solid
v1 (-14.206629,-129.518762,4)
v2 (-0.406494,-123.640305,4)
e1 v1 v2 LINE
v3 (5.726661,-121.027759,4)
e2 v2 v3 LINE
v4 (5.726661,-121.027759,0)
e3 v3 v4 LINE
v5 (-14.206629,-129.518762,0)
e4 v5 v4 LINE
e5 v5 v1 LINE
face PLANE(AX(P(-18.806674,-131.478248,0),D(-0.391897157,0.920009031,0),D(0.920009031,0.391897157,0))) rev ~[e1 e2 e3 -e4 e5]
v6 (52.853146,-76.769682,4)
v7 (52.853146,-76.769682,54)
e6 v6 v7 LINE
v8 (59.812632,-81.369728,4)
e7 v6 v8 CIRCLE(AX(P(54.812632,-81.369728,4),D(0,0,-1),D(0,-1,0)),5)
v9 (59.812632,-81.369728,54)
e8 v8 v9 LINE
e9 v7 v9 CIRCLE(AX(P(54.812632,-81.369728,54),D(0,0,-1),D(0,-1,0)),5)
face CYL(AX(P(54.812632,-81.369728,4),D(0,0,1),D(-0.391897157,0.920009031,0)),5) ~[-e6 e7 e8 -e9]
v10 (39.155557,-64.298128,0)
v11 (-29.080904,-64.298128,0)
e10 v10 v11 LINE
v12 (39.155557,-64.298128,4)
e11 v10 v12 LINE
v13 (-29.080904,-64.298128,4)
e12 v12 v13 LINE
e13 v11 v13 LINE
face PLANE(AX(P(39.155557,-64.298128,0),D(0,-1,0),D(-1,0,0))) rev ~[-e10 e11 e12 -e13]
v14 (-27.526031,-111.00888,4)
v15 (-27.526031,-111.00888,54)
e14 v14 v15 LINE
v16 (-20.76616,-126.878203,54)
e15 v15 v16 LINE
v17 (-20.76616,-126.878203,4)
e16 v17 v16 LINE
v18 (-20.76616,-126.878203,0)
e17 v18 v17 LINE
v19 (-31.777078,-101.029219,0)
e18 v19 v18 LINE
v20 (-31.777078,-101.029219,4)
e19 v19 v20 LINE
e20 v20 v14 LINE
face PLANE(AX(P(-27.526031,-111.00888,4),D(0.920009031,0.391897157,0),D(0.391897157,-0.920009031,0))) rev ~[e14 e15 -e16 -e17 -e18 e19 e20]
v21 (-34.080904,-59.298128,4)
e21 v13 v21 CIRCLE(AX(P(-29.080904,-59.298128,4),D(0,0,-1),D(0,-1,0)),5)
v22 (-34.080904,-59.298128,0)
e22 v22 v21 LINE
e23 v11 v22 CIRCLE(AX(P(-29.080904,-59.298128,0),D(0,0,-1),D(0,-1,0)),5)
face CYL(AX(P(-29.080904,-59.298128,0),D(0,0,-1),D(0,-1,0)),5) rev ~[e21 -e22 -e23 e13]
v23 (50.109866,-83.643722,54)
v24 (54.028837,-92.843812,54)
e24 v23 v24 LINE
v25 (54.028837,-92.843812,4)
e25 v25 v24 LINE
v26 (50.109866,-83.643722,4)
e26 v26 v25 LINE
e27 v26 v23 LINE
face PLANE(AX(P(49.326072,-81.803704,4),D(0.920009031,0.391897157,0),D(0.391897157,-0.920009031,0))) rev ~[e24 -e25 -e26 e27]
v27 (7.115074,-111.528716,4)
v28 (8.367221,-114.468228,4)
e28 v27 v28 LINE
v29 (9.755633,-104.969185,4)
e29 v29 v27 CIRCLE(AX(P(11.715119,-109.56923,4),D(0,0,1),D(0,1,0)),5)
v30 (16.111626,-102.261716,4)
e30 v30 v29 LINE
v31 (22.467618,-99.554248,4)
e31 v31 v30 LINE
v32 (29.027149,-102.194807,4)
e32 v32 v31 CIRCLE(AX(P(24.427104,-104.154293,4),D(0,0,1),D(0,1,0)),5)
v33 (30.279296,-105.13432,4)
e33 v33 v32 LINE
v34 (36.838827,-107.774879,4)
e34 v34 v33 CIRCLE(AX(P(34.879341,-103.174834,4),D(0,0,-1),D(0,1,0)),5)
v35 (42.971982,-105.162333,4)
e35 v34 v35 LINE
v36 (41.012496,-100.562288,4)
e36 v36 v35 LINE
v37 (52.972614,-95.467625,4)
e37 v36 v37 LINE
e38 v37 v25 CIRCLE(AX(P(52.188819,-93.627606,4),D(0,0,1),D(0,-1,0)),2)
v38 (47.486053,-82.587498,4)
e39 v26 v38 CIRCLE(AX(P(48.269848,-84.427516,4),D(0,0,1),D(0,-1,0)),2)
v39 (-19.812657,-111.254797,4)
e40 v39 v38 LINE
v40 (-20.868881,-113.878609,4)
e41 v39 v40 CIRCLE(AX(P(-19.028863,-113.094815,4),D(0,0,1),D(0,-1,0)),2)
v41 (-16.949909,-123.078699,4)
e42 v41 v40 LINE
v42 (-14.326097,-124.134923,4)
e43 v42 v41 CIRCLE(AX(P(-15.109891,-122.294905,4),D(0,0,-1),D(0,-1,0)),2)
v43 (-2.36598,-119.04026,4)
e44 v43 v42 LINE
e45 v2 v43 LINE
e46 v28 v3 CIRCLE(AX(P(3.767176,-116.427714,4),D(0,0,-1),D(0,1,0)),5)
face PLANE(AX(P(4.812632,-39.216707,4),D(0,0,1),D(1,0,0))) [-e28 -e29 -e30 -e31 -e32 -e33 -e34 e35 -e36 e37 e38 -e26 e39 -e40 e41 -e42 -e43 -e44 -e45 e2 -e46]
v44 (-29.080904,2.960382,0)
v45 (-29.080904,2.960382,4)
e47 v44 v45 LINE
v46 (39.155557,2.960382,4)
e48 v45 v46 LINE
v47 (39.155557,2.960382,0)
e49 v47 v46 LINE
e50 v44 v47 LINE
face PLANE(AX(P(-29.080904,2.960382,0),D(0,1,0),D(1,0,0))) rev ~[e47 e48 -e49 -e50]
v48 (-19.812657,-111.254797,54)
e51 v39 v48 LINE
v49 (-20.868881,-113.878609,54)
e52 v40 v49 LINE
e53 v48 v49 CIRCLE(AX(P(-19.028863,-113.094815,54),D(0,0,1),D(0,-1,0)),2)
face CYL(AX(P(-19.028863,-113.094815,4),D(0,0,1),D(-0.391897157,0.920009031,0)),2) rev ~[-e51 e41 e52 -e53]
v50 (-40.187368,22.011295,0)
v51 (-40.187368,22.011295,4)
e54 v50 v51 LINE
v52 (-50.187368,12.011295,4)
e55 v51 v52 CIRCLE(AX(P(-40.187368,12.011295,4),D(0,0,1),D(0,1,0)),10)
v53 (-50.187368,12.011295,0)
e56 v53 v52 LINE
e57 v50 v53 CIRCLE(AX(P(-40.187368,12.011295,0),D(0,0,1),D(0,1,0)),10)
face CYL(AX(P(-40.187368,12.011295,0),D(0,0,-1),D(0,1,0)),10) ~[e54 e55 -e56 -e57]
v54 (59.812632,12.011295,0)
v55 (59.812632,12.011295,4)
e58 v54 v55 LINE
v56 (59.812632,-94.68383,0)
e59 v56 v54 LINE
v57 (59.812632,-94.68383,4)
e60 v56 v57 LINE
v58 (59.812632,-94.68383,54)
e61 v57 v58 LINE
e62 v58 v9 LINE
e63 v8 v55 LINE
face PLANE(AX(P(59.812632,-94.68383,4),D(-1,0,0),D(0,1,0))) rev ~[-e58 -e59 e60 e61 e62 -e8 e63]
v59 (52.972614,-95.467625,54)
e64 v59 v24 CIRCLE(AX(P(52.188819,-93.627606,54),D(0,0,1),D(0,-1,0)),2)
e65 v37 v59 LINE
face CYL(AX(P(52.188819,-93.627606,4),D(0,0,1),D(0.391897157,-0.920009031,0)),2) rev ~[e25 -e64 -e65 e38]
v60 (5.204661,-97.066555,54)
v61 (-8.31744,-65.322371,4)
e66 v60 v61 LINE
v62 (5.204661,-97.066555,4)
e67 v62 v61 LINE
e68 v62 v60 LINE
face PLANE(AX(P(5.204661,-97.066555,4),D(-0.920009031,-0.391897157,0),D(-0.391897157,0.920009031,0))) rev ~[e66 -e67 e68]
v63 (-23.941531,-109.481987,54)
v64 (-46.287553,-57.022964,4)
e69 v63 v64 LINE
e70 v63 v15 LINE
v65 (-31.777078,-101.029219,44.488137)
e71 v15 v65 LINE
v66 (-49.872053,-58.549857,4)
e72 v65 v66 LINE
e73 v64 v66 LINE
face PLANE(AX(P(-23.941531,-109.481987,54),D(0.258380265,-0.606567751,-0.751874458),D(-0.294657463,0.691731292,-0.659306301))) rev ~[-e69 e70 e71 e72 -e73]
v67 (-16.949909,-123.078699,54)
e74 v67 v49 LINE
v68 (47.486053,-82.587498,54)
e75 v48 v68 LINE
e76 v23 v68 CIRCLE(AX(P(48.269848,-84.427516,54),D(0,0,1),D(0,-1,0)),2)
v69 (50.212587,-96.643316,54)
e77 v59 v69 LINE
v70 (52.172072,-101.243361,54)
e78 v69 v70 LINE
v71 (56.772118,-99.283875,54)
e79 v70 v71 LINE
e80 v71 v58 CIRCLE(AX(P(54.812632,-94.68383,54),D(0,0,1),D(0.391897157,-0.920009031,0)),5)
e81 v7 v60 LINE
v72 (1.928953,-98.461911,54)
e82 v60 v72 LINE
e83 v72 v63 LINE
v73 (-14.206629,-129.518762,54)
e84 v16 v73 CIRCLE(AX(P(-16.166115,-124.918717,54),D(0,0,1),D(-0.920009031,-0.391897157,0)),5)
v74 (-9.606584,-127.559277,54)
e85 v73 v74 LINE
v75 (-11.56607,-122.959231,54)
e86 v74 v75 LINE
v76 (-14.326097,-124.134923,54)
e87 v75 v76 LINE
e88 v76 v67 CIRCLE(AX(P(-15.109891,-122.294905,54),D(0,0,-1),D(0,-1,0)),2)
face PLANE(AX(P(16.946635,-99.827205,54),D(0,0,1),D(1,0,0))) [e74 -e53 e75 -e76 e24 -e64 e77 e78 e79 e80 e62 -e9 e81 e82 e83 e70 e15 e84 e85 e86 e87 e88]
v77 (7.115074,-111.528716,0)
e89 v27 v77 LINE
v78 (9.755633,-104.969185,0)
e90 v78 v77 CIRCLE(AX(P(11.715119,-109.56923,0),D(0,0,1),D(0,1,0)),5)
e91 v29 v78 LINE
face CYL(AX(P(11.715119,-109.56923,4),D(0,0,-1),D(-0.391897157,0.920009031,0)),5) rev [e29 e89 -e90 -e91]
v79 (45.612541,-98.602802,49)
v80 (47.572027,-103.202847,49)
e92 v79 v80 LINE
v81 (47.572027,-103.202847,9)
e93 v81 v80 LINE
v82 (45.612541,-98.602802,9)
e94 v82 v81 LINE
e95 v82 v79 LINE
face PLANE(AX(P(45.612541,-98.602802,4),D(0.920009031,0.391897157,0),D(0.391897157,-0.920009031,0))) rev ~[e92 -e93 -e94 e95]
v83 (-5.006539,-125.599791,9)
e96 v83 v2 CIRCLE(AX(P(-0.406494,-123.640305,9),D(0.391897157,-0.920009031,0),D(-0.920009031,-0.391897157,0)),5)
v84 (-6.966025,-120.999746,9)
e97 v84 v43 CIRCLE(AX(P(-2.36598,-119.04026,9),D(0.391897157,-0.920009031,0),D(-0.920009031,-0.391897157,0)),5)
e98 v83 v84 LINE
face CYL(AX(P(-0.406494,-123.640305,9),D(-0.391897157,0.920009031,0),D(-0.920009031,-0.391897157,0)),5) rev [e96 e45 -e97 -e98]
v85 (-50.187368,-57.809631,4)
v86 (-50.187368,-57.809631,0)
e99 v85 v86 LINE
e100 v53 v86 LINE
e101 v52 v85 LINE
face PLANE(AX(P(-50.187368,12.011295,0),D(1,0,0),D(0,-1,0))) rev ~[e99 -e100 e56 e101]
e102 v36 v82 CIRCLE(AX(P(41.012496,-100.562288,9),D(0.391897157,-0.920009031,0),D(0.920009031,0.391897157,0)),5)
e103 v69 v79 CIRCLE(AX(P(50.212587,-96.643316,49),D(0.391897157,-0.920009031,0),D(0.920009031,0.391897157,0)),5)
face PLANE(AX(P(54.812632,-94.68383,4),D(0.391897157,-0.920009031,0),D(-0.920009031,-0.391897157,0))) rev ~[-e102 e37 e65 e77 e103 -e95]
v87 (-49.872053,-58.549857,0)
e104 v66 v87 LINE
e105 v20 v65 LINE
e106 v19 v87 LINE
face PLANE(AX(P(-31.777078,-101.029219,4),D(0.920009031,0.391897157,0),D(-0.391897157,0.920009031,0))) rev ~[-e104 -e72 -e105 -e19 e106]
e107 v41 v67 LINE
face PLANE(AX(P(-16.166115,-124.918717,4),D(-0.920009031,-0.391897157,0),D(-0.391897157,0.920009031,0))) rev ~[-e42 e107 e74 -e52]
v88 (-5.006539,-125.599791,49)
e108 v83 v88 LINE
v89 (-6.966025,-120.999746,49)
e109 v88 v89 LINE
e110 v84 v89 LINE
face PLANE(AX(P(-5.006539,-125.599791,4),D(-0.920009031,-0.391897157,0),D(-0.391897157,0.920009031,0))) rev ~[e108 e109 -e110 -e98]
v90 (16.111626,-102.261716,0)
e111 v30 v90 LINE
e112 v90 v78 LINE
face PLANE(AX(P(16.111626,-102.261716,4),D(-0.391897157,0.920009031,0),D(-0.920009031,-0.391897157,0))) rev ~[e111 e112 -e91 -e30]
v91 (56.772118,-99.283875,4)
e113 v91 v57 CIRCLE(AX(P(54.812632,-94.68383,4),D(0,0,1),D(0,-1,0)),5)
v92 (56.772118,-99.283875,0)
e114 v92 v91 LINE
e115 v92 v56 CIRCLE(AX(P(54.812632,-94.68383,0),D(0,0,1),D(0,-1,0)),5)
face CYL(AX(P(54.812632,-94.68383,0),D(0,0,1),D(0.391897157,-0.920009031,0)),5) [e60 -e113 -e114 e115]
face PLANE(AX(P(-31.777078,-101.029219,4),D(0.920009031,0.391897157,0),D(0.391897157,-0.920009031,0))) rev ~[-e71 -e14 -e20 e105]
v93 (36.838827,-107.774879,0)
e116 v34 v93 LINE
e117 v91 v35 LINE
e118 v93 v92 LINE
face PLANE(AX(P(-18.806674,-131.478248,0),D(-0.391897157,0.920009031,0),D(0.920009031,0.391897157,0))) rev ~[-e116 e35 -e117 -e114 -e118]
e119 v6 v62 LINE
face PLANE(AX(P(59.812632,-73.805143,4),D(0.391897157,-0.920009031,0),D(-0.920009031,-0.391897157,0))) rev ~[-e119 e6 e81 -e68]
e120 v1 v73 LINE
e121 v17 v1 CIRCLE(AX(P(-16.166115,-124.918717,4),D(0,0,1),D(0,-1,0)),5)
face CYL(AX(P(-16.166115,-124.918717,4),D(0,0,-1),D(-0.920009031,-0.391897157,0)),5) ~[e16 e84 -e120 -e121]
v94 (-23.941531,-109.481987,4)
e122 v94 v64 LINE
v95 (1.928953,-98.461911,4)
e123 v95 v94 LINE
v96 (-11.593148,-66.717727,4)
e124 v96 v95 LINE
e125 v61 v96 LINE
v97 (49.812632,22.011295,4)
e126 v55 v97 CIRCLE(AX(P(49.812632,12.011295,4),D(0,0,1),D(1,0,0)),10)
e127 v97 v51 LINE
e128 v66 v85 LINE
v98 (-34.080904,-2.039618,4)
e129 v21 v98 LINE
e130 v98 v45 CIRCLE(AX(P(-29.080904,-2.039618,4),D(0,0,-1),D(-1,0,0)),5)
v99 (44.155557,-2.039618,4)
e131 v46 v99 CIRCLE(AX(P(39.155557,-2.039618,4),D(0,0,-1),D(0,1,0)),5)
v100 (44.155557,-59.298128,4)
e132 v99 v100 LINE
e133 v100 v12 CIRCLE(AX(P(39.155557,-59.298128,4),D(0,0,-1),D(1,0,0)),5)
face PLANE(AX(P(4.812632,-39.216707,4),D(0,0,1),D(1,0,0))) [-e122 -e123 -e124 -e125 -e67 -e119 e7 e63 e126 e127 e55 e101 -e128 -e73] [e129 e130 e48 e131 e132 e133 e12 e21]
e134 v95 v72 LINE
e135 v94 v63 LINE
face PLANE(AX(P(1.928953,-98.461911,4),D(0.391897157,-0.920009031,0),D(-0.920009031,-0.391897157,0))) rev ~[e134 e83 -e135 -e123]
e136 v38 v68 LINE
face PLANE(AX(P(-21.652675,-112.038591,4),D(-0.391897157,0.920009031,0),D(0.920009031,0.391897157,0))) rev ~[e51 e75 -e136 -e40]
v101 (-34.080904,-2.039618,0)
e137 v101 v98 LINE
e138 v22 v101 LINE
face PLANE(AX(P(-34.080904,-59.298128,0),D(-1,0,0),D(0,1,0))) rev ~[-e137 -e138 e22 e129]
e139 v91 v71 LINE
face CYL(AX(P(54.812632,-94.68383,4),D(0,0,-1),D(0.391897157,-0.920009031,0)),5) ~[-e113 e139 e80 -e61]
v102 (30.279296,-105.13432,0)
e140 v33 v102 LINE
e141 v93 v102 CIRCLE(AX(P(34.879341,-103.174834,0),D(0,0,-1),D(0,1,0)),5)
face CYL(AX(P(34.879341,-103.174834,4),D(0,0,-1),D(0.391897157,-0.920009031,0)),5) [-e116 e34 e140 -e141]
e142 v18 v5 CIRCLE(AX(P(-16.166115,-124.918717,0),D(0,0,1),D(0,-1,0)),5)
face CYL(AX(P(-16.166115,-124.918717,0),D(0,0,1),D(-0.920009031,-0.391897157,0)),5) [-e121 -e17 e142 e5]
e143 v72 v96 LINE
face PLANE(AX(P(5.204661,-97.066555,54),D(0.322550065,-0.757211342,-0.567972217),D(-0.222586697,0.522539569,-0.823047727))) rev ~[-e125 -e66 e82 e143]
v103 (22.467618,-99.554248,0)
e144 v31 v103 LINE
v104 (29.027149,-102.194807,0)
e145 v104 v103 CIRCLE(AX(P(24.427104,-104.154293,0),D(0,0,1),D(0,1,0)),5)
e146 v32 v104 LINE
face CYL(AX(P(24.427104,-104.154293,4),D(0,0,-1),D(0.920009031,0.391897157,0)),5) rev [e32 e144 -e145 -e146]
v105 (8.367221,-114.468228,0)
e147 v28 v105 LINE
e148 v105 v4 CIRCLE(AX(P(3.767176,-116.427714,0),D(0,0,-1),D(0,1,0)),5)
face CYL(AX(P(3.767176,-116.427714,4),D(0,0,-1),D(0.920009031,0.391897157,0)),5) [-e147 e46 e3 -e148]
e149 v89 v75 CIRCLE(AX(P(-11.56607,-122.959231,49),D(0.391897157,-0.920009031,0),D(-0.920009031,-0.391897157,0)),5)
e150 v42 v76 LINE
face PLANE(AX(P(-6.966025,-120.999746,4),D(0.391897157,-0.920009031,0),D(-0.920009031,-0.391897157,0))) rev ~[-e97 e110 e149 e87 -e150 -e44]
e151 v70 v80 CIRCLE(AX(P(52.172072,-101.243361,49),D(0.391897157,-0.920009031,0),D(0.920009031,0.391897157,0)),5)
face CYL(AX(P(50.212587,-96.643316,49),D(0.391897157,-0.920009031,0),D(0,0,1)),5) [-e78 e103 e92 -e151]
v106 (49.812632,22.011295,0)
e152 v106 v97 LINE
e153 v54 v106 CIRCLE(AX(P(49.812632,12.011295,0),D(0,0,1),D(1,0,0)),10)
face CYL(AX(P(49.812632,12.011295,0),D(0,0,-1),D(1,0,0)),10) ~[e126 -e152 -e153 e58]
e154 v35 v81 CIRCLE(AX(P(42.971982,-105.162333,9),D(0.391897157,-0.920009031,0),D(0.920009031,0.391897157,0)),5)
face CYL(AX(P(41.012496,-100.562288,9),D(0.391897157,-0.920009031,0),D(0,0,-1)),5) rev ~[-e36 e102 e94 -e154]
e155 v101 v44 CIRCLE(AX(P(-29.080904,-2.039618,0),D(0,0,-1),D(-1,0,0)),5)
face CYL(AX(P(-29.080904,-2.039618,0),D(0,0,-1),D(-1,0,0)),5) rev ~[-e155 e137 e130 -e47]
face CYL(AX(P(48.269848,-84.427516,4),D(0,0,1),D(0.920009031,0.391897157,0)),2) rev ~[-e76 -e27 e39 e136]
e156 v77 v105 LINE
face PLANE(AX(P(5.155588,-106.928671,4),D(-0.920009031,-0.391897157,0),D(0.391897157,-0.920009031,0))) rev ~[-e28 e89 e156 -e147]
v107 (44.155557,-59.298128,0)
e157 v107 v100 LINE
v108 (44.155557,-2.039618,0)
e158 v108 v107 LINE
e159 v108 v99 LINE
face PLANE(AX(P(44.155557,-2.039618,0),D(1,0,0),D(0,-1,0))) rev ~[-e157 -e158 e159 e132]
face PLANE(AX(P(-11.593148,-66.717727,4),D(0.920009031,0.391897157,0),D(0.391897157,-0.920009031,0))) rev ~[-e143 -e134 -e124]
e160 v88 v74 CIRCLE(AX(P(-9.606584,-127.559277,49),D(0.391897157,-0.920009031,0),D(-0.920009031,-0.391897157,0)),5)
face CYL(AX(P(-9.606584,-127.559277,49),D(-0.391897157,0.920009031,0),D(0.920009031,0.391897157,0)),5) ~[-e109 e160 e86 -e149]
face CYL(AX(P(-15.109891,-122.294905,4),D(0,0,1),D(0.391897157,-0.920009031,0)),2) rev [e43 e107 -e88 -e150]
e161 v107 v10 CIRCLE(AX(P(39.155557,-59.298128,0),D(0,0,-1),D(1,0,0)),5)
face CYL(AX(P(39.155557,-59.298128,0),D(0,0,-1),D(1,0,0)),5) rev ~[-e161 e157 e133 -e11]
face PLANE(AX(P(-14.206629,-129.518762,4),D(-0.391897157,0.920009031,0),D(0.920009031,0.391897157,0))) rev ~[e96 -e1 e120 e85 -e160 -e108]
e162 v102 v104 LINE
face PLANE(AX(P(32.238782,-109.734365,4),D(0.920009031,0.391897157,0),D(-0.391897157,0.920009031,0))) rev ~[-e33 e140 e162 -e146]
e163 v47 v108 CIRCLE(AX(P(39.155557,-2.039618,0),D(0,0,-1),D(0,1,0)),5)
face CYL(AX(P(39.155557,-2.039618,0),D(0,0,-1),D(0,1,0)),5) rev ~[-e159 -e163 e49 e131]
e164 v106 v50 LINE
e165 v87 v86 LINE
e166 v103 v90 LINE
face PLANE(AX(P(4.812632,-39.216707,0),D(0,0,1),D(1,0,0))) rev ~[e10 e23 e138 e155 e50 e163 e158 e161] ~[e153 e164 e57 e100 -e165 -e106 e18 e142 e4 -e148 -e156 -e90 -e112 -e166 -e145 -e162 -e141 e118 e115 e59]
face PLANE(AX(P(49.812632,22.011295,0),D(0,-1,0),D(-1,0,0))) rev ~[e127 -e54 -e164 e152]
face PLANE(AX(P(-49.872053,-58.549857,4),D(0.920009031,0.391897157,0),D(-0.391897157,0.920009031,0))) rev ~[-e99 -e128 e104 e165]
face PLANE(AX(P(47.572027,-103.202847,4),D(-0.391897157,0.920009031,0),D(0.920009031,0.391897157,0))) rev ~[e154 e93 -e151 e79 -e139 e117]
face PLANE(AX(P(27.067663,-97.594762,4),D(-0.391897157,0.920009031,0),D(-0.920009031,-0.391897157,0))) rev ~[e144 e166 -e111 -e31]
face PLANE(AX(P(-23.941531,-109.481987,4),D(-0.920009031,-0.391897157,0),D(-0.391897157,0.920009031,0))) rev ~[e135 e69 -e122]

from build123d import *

# Parameters (mm, degrees)
F1_DEPTH  = 4
F2_R      = 5
F4_DEPTH  = 50
F6_DEPTH  = 25
F7_R      = 5
F8_R      = 2
F10_DEPTH = 25
F12_DEPTH = 25
F14_DEPTH = 25
F15_R     = 5


with BuildPart() as f1:
    # F0 (on Top) → F1 (new body)
    with BuildSketch(Plane.XY):
        with BuildLine():
            Line((49.8126317561, 22.0112954478), (-40.1873682439, 22.0112954478))
            ThreePointArc((-40.1873682439, 22.0112954478), (-47.2584360558, 19.0823632597), (-50.1873682439, 12.0112954478))
            Line((-50.1873682439, 12.0112954478), (-50.1873682439, -97.9887045522))
            Line((-50.1873682439, -97.9887045522), (-33.0722484738, -97.9887045522))
            Line((-33.0722484738, -97.9887045522), (59.8126317561, -97.9887045522))
            Line((59.8126317561, -97.9887045522), (59.8126317561, 12.0112954478))
            ThreePointArc((59.8126317561, 12.0112954478), (56.8836995679, 19.0823632597), (49.8126317561, 22.0112954478))
        make_face()
        with BuildLine():
            Line((-34.0809039772, -59.2981277779), (-34.0809039772, -2.0396176167))
            ThreePointArc((-34.0809039772, -2.0396176167), (-32.6164378831, 1.4959162892), (-29.0809039772, 2.9603823833))
            Line((-29.0809039772, 2.9603823833), (39.1555567086, 2.9603823833))
            ThreePointArc((39.1555567086, 2.9603823833), (42.6910906145, 1.4959162892), (44.1555567086, -2.0396176167))
            Line((44.1555567086, -2.0396176167), (44.1555567086, -59.2981277779))
            ThreePointArc((44.1555567086, -59.2981277779), (42.6910906145, -62.8336616838), (39.1555567086, -64.2981277779))
            Line((39.1555567086, -64.2981277779), (-29.0809039772, -64.2981277779))
            ThreePointArc((-29.0809039772, -64.2981277779), (-32.6164378831, -62.8336616838), (-34.0809039772, -59.2981277779))
        make_face(mode=Mode.SUBTRACT)
        Polygon((-18.8066744284, -131.4782482004), (59.8126317561, -97.9887045522), (-33.0722484738, -97.9887045522), align=None)
    extrude(amount=F1_DEPTH)

    # F2
    f2_edges = [f1.edges().sort_by_distance(p)[0] for p in [
        (-33.072248, -97.988705, 2),
        (-50.187368, -97.988705, 2),
        (59.812632, -97.988705, 2),
        (-18.806674, -131.478248, 2),
    ]]
    fillet(f2_edges, radius=F2_R)

    # F3 (on face) → F4 (join)
    with BuildSketch(Plane.XY.offset(4)):
        with BuildLine():
            Line((-6.9660247439, -120.9997456811), (-16.1661150585, -124.9187172558))
            Line((-16.1661150585, -124.9187172558), (-21.6526752631, -112.0385908154))
            Line((-21.6526752631, -112.0385908154), (49.3260715515, -81.8037038021))
            Line((49.3260715515, -81.8037038021), (54.8126317561, -94.6838302426))
            Line((54.8126317561, -94.6838302426), (45.6125414415, -98.6028018173))
            Line((45.6125414415, -98.6028018173), (47.5720272288, -103.2028469746))
            Line((47.5720272288, -103.2028469746), (56.7721175434, -99.2838753999))
            ThreePointArc((56.7721175434, -99.2838753999), (58.9838083848, -97.4408731388), (59.8126317561, -94.6838302426))
            Line((59.8126317561, -94.6838302426), (59.8126317561, -73.8051433371))
            Line((59.8126317561, -73.8051433371), (5.2046610063, -97.0665546714))
            Line((5.2046610063, -97.0665546714), (1.9289534576, -98.4619110571))
            Line((1.9289534576, -98.4619110571), (-23.9415310778, -109.4819869532))
            Line((-23.9415310778, -109.4819869532), (-27.5260314097, -111.0088801064))
            Line((-27.5260314097, -111.0088801064), (-20.7661602158, -126.8782030431))
            ThreePointArc((-20.7661602158, -126.8782030431), (-18.0332724951, -129.5570060682), (-14.2066292711, -129.5187624131))
            Line((-14.2066292711, -129.5187624131), (-5.0065389565, -125.5997908384))
            Line((-5.0065389565, -125.5997908384), (-6.9660247439, -120.9997456811))
        make_face()
        Polygon((-31.7770776261, -101.0292187648), (-27.5260314097, -111.0088801064), (-23.9415310778, -109.4819869532), (-46.2875531446, -57.0229636434), (-49.8720534765, -58.5498567966), align=None)
        Polygon((1.9289534576, -98.4619110571), (5.2046610063, -97.0665546714), (-8.3174404532, -65.3223706937), (-11.5931480018, -66.7177270794), align=None)
    extrude(amount=F4_DEPTH)

    # F5 (on face) → F6 (cut)
    with BuildSketch(Plane.XY.offset(4)):
        Polygon((10.3267065007, -119.0682730989), (21.2827441361, -114.4013189065), (16.1116256489, -102.2617164104), (5.1555880134, -106.9286706028), align=None)
        Polygon((16.1116256489, -102.2617164104), (21.2827441361, -114.4013189065), (32.2387817716, -109.734364714), (27.0676632843, -97.5947622179), align=None)
    extrude(amount=-F6_DEPTH, mode=Mode.SUBTRACT)

    # F7
    f7_edges = [f1.edges().sort_by_distance(p)[0] for p in [
        (-5.986282, -123.299768, 54),
        (46.592284, -100.902824, 54),
        (46.592284, -100.902824, 4),
        (-5.986282, -123.299768, 4),
        (32.238782, -109.734365, 2),
        (10.326707, -119.068273, 2),
        (27.067663, -97.594762, 2),
        (5.155588, -106.928671, 2),
    ]]
    fillet(f7_edges, radius=F7_R)

    # F8
    f8_edges = [f1.edges().sort_by_distance(p)[0] for p in [
        (49.326072, -81.803704, 29),
        (54.812632, -94.68383, 29),
        (-21.652675, -112.038591, 29),
        (-16.166115, -124.918717, 29),
    ]]
    fillet(f8_edges, radius=F8_R)

    # F9 (on face) → F10 (cut)
    with BuildSketch(Plane(origin=(-59.7381223873, -25.4467071035, 0), x_dir=(-0.3918971575, 0.9200090315, 0), z_dir=(0.9200090315, 0.3918971575, 0))):
        Polygon((-34.321681049, 54), (-91.3417988043, 54), (-34.321681049, 4), align=None)
    extrude(amount=-F10_DEPTH, mode=Mode.SUBTRACT)

    # F11 (on face) → F12 (cut)
    with BuildSketch(Plane.XY.offset(4)):
        with BuildLine():
            ThreePointArc((-36.3771227834, -97.9887045522), (-33.6200798872, -98.8175279234), (-31.7770776261, -101.0292187648))
            Line((-31.7770776261, -101.0292187648), (-49.8720534765, -58.5498567966))
            Line((-49.8720534765, -58.5498567966), (-50.1873682439, -57.809630877))
            Line((-50.1873682439, -57.809630877), (-50.1873682439, -92.9887045522))
            ThreePointArc((-50.1873682439, -92.9887045522), (-48.7229021499, -96.5242384581), (-45.1873682439, -97.9887045522))
            Line((-45.1873682439, -97.9887045522), (-36.3771227834, -97.9887045522))
        make_face()
    extrude(amount=-F12_DEPTH, mode=Mode.SUBTRACT)

    # F13 (on face) → F14 (cut)
    with BuildSketch(Plane(origin=(-30.5919303032, -13.0312748216, 0), x_dir=(-0.3918971575, 0.9200090315, 0), z_dir=(0.9200090315, 0.3918971575, 0))):
        Polygon((-56.8375897235, 54), (-91.3417988043, 54), (-56.8375897235, 4), align=None)
    extrude(amount=-F14_DEPTH, mode=Mode.SUBTRACT)

    # F15
    f15_edges = [f1.edges().sort_by_distance(p)[0] for p in [
        (59.812632, -73.805143, 29),
    ]]
    fillet(f15_edges, radius=F15_R)


solid = f1.part
